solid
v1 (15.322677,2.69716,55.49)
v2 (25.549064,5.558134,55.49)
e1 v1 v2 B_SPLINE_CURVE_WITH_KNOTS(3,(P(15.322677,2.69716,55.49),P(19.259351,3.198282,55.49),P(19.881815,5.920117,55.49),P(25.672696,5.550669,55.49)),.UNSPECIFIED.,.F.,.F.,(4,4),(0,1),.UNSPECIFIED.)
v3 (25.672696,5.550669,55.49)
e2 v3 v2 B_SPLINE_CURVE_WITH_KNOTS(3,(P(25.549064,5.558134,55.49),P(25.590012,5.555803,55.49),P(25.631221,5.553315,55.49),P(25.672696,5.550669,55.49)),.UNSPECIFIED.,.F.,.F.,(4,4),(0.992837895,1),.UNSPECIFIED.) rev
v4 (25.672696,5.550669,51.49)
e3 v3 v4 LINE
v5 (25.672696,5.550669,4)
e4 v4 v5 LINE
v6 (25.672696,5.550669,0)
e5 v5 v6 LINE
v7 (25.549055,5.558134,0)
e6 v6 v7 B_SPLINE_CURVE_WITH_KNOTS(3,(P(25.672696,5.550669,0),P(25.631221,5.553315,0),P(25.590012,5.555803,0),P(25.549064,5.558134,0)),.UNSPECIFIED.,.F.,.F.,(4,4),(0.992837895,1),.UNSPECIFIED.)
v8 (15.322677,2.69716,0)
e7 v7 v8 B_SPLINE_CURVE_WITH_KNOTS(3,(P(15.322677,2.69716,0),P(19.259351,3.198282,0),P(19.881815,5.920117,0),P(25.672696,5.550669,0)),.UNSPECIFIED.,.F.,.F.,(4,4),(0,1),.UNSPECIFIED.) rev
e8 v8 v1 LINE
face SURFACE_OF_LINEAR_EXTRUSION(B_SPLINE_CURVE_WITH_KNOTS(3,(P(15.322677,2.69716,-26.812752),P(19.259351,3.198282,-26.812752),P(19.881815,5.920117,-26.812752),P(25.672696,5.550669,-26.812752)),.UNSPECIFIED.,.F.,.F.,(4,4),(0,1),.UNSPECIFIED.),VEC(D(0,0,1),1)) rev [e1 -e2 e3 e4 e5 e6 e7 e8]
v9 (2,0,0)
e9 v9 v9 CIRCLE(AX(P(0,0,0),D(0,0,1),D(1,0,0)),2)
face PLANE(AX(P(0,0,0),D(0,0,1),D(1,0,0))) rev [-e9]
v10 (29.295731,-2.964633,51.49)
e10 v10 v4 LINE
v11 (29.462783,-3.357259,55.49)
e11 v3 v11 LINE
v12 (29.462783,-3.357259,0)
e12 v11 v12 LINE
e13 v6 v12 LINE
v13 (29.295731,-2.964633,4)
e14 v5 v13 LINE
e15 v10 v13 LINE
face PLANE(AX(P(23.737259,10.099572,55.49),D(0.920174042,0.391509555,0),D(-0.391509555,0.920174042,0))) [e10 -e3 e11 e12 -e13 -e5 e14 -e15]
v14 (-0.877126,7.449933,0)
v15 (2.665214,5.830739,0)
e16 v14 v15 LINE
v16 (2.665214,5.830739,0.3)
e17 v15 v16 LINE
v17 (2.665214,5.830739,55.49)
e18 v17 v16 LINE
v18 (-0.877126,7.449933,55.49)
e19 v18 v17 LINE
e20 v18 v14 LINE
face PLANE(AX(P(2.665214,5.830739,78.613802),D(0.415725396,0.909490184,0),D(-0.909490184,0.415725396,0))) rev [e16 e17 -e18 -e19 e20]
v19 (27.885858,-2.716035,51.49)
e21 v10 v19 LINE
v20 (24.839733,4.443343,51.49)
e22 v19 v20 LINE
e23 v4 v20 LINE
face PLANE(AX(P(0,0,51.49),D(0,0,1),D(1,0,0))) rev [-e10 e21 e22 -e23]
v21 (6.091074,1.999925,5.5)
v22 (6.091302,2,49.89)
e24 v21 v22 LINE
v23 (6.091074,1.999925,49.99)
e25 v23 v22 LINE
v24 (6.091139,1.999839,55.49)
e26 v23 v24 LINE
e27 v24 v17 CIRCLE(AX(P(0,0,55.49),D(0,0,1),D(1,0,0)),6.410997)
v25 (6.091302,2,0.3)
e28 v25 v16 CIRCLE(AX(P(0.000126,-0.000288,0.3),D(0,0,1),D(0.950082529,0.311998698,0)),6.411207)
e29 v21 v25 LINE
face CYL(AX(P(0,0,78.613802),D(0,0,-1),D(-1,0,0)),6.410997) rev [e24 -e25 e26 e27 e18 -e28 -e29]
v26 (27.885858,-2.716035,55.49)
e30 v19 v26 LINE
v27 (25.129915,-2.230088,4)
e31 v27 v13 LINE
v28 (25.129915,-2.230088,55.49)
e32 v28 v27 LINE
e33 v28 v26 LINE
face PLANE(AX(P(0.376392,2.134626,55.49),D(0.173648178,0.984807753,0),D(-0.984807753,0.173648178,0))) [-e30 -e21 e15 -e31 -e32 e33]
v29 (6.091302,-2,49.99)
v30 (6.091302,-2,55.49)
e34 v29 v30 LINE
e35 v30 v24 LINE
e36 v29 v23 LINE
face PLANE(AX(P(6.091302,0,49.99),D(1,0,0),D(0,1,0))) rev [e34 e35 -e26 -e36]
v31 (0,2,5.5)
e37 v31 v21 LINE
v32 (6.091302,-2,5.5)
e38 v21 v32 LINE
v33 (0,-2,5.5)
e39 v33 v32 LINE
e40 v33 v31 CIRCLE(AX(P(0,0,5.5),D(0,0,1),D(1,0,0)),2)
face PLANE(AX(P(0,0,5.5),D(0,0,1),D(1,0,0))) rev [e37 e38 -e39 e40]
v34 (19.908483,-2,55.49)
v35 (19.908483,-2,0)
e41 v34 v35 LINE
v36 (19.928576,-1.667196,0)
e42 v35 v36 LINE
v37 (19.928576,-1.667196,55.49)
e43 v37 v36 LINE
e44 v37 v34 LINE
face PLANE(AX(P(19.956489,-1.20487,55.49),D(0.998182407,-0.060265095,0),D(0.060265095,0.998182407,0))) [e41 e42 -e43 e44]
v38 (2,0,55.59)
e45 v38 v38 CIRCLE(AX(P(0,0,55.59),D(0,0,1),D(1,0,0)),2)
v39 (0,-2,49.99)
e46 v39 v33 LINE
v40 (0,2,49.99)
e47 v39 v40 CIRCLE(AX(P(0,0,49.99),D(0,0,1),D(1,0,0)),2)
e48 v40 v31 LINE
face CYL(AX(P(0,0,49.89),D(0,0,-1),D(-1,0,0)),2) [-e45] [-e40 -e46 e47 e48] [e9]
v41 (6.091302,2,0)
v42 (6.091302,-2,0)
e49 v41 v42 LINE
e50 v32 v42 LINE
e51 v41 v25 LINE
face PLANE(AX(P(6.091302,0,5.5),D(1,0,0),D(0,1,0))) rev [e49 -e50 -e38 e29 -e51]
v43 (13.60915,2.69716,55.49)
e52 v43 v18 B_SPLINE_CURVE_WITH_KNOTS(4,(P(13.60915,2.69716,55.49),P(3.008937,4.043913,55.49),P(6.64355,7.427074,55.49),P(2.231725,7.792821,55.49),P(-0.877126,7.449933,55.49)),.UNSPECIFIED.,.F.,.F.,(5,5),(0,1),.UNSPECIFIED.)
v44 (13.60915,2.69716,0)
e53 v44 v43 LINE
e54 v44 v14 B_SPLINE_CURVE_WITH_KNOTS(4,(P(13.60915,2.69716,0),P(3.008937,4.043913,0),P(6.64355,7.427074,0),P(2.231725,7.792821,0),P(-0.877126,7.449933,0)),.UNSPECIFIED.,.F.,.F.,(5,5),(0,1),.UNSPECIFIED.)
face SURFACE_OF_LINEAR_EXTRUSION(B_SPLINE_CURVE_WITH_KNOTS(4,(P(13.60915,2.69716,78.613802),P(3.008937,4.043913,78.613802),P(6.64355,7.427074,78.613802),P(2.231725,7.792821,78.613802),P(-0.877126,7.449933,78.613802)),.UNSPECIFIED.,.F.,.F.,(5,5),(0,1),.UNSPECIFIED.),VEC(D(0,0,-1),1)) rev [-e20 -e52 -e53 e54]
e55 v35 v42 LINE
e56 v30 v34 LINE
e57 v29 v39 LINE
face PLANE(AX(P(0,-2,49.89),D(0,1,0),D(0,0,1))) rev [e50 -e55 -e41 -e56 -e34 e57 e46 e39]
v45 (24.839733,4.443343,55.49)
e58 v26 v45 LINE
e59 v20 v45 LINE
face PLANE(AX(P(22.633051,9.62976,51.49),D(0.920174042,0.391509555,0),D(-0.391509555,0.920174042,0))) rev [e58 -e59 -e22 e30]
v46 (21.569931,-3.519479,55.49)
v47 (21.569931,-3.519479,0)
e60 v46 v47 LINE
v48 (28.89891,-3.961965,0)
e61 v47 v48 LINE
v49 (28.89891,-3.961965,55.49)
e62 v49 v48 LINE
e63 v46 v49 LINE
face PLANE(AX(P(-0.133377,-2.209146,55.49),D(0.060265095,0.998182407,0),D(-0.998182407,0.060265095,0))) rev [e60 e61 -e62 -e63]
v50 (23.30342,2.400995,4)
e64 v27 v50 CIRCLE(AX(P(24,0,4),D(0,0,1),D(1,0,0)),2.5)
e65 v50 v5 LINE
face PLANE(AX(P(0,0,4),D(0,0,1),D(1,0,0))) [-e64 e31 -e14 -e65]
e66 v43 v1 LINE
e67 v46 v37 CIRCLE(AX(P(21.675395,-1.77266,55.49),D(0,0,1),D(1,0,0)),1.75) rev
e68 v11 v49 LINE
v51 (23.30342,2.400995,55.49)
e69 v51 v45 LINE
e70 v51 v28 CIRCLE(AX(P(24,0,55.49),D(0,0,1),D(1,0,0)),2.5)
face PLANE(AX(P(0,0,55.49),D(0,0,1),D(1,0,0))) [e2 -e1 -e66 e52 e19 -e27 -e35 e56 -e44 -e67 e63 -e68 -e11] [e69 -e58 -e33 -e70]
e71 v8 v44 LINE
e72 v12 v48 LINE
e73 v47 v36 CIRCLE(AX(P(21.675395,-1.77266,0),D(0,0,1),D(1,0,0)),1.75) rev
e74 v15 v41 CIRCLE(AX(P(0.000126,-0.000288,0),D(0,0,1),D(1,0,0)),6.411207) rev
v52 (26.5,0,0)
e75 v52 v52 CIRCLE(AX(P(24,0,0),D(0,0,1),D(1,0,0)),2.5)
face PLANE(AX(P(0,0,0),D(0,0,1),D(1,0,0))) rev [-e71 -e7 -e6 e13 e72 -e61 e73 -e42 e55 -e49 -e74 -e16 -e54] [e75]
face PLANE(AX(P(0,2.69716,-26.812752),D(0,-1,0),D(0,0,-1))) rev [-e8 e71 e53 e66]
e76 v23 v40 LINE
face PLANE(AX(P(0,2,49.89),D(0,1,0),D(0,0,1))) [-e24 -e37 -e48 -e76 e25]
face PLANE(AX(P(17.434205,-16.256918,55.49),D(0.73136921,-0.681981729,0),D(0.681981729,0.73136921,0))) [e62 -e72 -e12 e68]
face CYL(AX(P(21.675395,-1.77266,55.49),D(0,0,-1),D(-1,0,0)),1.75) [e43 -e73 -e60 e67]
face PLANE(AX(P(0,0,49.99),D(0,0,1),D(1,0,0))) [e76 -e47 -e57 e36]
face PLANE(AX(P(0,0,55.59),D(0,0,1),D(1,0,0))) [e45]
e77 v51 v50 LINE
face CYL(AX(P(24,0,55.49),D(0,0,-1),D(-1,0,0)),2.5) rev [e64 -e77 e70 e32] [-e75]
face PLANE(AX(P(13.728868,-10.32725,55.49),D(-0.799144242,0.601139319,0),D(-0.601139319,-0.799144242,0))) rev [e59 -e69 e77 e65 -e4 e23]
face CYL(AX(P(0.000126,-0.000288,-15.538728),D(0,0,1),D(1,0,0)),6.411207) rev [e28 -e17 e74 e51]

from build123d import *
from build123d.topology import SkipClean

# Parameters (mm, degrees)
BOSS_EXTRUDE1_DEPTH              = 55.49
BOSS_EXTRUDE5_DEPTH              = 4
BOSS_EXTRUDE6_START              = 51.49
BOSS_EXTRUDE6_DEPTH              = 4
BOSS_EXTRUDE7_START              = 5.6
BOSS_EXTRUDE7_DEPTH              = 44.29
SKETCH1_11_R                     = 2
BOSS_EXTRUDE8_DEPTH              = 55.59
BOSS_EXTRUDE9_DEPTH              = 55.49
BOSS_EXTRUDE10_REACH             = 60.551
SKETCH3_W                        = 44.29
SKETCH3_H                        = 4
BOSS_EXTRUDE11_START             = -49.89
BOSS_EXTRUDE11_DEPTH             = 55.49
CUT_EXTRUDE1_DEPTH               = 55.59
CUT_EXTRUDE1_DEPTH_BACK          = 55.59
BOSS_EXTRUDE12_DEPTH             = 49.59
BOSS_EXTRUDE12_DIRECTION_2_REACH = 60.225
BOSS_EXTRUDE13_DEPTH             = 4
BOSS_EXTRUDE14_START             = 55.49
BOSS_EXTRUDE14_DEPTH             = 4
BOSS_EXTRUDE15_DEPTH             = 0.3
CUT_EXTRUDE2_DEPTH               = 5.5
CUT_EXTRUDE3_START               = 55.49
CUT_EXTRUDE3_DEPTH               = 5.5
BOSS_EXTRUDE16_DEPTH             = 4
CUT_EXTRUDE4_DEPTH               = 5.5
CUT_EXTRUDE5_START               = -55.49
CUT_EXTRUDE5_DEPTH               = 5.5


# Read off the part's stored shape, not the designer's step: Boss-Extrude6
with BuildPart() as part:
    # Sketch1 → Boss-Extrude1 (new body)
    with BuildSketch(Plane.XY):
        with BuildLine():
            ThreePointArc((1.129915274, -2.230087773), (-2.325656227, -0.917236673), (-0.696579505, 2.400995001))
            Line((-0.696579505, 2.400995001), (0.839733193, 4.443342601))
            Line((0.839733193, 4.443342601), (1.672696268, 5.550669345))
            Line((1.672696268, 5.550669345), (-1.620002468, 5.749465478))
            Line((-1.620002468, 5.749465478), (-3.736897473, 3.873630853))
            Line((-3.736897473, 3.873630853), (-4.07142398, -1.667196274))
            ThreePointArc((-4.07142398, -1.667196274), (-3.634366728, -2.93327365), (-2.430068683, -3.519479403))
            Line((-2.430068683, -3.519479403), (4.898910437, -3.961965286))
            Line((4.898910437, -3.961965286), (5.462782558, -3.357258899))
            Line((5.462782558, -3.357258899), (5.295730888, -2.964633462))
            Line((5.295730888, -2.964633462), (3.885857643, -2.716034769))
            Line((3.885857643, -2.716034769), (1.129915274, -2.230087773))
        make_face()
    extrude(amount=BOSS_EXTRUDE1_DEPTH)

    # Sketch1<8> → Boss-Extrude5 (add)
    with BuildSketch(Plane.XY):
        Polygon((1.672696268, 5.550669345), (0.839733193, 4.443342601), (3.885857643, -2.716034769), (5.295730888, -2.964633462), align=None)
    extrude(amount=BOSS_EXTRUDE5_DEPTH)

    # Boss-Extrude6 outline → Boss-Extrude6 (add)
    with BuildSketch(Plane.XY.offset(BOSS_EXTRUDE6_START)):
        Polygon((3.885857643, -2.71603477), (5.295730888, -2.964633462), (1.672696268, 5.550669345), (0.839733193, 4.443342601), align=None)
    extrude(amount=BOSS_EXTRUDE6_DEPTH)


with BuildPart() as body_2:
    # Sketch1<10> → Boss-Extrude7 (new body)
    with BuildSketch(Plane.XY.offset(BOSS_EXTRUDE7_START)):
        with BuildLine():
            Line((0, -2), (12, -2))
            Line((12, -2), (12, 2))
            Line((12, 2), (0, 2))
            ThreePointArc((0, 2), (-2, 0), (0, -2))
        make_face()
    extrude(amount=BOSS_EXTRUDE7_DEPTH)

    # Sketch1<11> → Boss-Extrude8 (add)
    with BuildSketch(Plane.XY):
        Circle(SKETCH1_11_R)
    extrude(amount=BOSS_EXTRUDE8_DEPTH)


with BuildPart() as body_3:
    # Sketch1<12> → Boss-Extrude9 (new body)
    with BuildSketch(Plane.XY):
        with BuildLine():
            Line((22.5, 2), (20.149982379, 2))
            Line((20.149982379, 2), (19.92857602, -1.667196274))
            ThreePointArc((19.92857602, -1.667196274), (19.926466234, -1.833875846), (19.940224749, -2))
            Line((19.940224749, -2), (22.5, -2))
            ThreePointArc((22.5, -2), (21.5, 0), (22.5, 2))
        make_face()
        with BuildLine():
            Line((20.263102527, 3.873630853), (20.149982379, 2))
            Line((20.149982379, 2), (22.5, 2))
            ThreePointArc((22.5, 2), (22.883559394, 2.236863959), (23.303420495, 2.400995001))
            Line((23.303420495, 2.400995001), (24.839733193, 4.443342601))
            Line((24.839733193, 4.443342601), (25.672696268, 5.550669345))
            Line((25.672696268, 5.550669345), (22.379997532, 5.749465478))
            Line((22.379997532, 5.749465478), (20.263102527, 3.873630853))
        make_face()
        with BuildLine():
            Line((22.5, -2), (19.940224749, -2))
            ThreePointArc((19.940224749, -2), (20.482001684, -3.052625751), (21.569931317, -3.519479403))
            Line((21.569931317, -3.519479403), (28.898910437, -3.961965286))
            Line((28.898910437, -3.961965286), (29.462782558, -3.357258899))
            Line((29.462782558, -3.357258899), (29.295730888, -2.964633462))
            Line((29.295730888, -2.964633462), (27.885857643, -2.716034769))
            Line((27.885857643, -2.716034769), (25.129915274, -2.230087773))
            ThreePointArc((25.129915274, -2.230087773), (23.782110643, -2.490486745), (22.5, -2))
        make_face()
    extrude(amount=BOSS_EXTRUDE9_DEPTH)

    # Boss-Extrude10: up to this face of the body (flat: up to its plane)
    boss_extrude10_end = Plane(body_3.part.faces().sort_by_distance((20.095839274, 1.10321729, 27.745))[0])
    # Sketch3 → Boss-Extrude10 (add, up to the picked face)
    with BuildSketch(Plane(origin=(12, 0, 0), x_dir=(0, 0, -1), z_dir=(1, 0, 0)), mode=Mode.PRIVATE) as boss_extrude10_sk1:
        with Locations((-27.745, 0)):
            Rectangle(SKETCH3_W, SKETCH3_H)
    boss_extrude10_tool1 = split(extrude(boss_extrude10_sk1.sketch, amount=BOSS_EXTRUDE10_REACH, mode=Mode.PRIVATE), bisect_by=boss_extrude10_end, keep=Keep.BOTH, mode=Mode.PRIVATE)

    add(body_2.part)  # Boss-Extrude10 merges body 2
    add(boss_extrude10_tool1.solids().sort_by(Axis((12, 0, 27.745), (1, 0, 0)))[0])

    # Sketch4 → Boss-Extrude11 (add)
    with BuildSketch(Plane.XY.offset(49.89).offset(BOSS_EXTRUDE11_START)):
        with BuildLine():
            Line((20.263102527, 3.873630853), (25.672696268, 5.550669345))
            add(Edge.make_bspline(
                [(18.253064845, 3.63105347), (20.126675338, 4.576543011), (21.657010209, 5.806862999), (25.672696268, 5.550669345)],
                knots=[0.306550142, 0.306550142, 0.306550142, 0.306550142, 1, 1, 1, 1], degree=3))
            add(Edge.make_bspline(
                [(15.322676772, 2.697160199), (16.529464831, 2.850779242), (17.424806601, 3.213085323), (18.253064845, 3.63105347)],
                knots=[0, 0, 0, 0, 0.306550142, 0.306550142, 0.306550142, 0.306550142], degree=3))
            Line((15.322676772, 2.697160199), (13.609149986, 2.697160199))
            Line((13.609149986, 2.697160199), (13.609149986, 2))
            Line((13.609149986, 2), (0, 2))
            ThreePointArc((0, 2), (2, 0), (0, -2))
            Line((0, -2), (6.092058814, -2))
            Line((6.092058814, -2), (19.908483051, -2))
            Line((19.908483051, -2), (20.263102527, 3.873630853))
        make_face()
    extrude(amount=BOSS_EXTRUDE11_DEPTH)

    # Sketch4<5> → Cut-Extrude1 (cut, two sides: drawn at the far end of the back side and taken through both)
    with BuildSketch(Plane.XY.offset(49.89).offset(-CUT_EXTRUDE1_DEPTH_BACK)):
        with BuildLine():
            add(Edge.make_bspline(
                [(18.253064845, 3.63105347), (20.126675338, 4.576543011), (21.657010209, 5.806862999), (25.672696268, 5.550669345)],
                knots=[0.306550142, 0.306550142, 0.306550142, 0.306550142, 1, 1, 1, 1], degree=3))
            Line((25.672696268, 5.550669345), (19.033452373, 9.878906939))
            Line((19.033452373, 9.878906939), (18.253064845, 3.63105347))
        make_face()
    extrude(amount=CUT_EXTRUDE1_DEPTH + CUT_EXTRUDE1_DEPTH_BACK, mode=Mode.SUBTRACT)

    # Sketch4<6> → Boss-Extrude12 (add)
    with BuildSketch(Plane.XY.offset(49.89)):
        with BuildLine():
            Line((6.092058814, 2), (13.609149986, 2))
            Line((13.609149986, 2), (13.609149986, 2.697160199))
            add(Edge.make_bspline(
                [(13.609149986, 2.697160199), (3.008937487, 4.043912628), (6.643549935, 7.427073901), (2.231724762, 7.792821065), (-0.877126137, 7.449933099)],
                knots=[0, 0, 0, 0, 0, 1, 1, 1, 1, 1], degree=4))
            Line((-0.877126137, 7.449933099), (2.665214437, 5.830739223))
            ThreePointArc((2.665214437, 5.830739223), (4.778774076, 4.27366426), (6.091049818, 2))
            Line((6.091049818, 2), (6.092058814, 2))
        make_face()
    extrude(amount=-BOSS_EXTRUDE12_DEPTH)

    # Boss-Extrude12 direction 2: up to this face of the body (flat: up to its plane)
    boss_extrude12_direction_2_end = Plane(body_3.part.faces().sort_by_distance((14.730018873, 0.349949508, 55.49))[0])
    # Sketch4<6> → Boss-Extrude12 direction 2 (add, up to the picked face)
    with BuildSketch(Plane.XY.offset(49.89), mode=Mode.PRIVATE) as boss_extrude12_direction_2_sk1:
        with BuildLine():
            Line((6.092058814, 2), (13.609149986, 2))
            Line((13.609149986, 2), (13.609149986, 2.697160199))
            add(Edge.make_bspline(
                [(13.609149986, 2.697160199), (3.008937487, 4.043912628), (6.643549935, 7.427073901), (2.231724762, 7.792821065), (-0.877126137, 7.449933099)],
                knots=[0, 0, 0, 0, 0, 1, 1, 1, 1, 1], degree=4))
            Line((-0.877126137, 7.449933099), (2.665214437, 5.830739223))
            ThreePointArc((2.665214437, 5.830739223), (4.778774076, 4.27366426), (6.091049818, 2))
            Line((6.091049818, 2), (6.092058814, 2))
        make_face()
    boss_extrude12_direction_2_tool1 = split(extrude(boss_extrude12_direction_2_sk1.sketch, amount=BOSS_EXTRUDE12_DIRECTION_2_REACH, mode=Mode.PRIVATE), bisect_by=boss_extrude12_direction_2_end, keep=Keep.BOTH, mode=Mode.PRIVATE)
    add(boss_extrude12_direction_2_tool1.solids().sort_by(Axis((6.524615, 4.223787, 49.89), (0, 0, 1)))[0])

    # Sketch1<13> → Boss-Extrude13 (add)
    with BuildSketch(Plane.XY):
        Polygon((25.672696268, 5.550669345), (24.839733193, 4.443342601), (27.885857643, -2.716034769), (29.295730888, -2.964633462), align=None)
    extrude(amount=BOSS_EXTRUDE13_DEPTH)

    # Sketch1<14> → Boss-Extrude14 (add)
    with BuildSketch(Plane.XY.offset(BOSS_EXTRUDE14_START)):
        Polygon((25.672696268, 5.550669345), (24.839733193, 4.443342601), (27.885857643, -2.716034769), (29.295730888, -2.964633462), align=None)
    extrude(amount=-BOSS_EXTRUDE14_DEPTH)

    # Sketch5 → Boss-Extrude15 (add)
    with BuildSketch(Plane(origin=(0, 0, 0.3), x_dir=(-1, 0, 0), z_dir=(0, 0, -1))):
        with BuildLine():
            Line((-13.609149986, 2), (-6.091302067, 2))
            ThreePointArc((-6.091302067, 2), (-4.778900201, 4.273690642), (-2.665214437, 5.830739223))
            Line((-2.665214437, 5.830739223), (0.877126137, 7.449933099))
            add(Edge.make_bspline(
                [(0.877126137, 7.449933099), (-2.231724762, 7.792821065), (-6.643549935, 7.427073901), (-3.008937487, 4.043912628), (-13.609149986, 2.697160199)],
                knots=[0, 0, 0, 0, 0, 1, 1, 1, 1, 1], degree=4))
            Line((-13.609149986, 2.697160199), (-13.609149986, 2))
        make_face()
    extrude(amount=BOSS_EXTRUDE15_DEPTH)

    # Sketch1<15> → Cut-Extrude2 (cut)
    with SkipClean():  # the faces are left unmerged after this step: merging them gives an invalid solid
        with BuildSketch(Plane.XY):
            with BuildLine():
                Line((0, -2), (4.885305034, -2))
                Line((4.885305034, -2), (3.183411536, 2))
                Line((3.183411536, 2), (0, 2))
                ThreePointArc((0, 2), (2, 0), (0, -2))
            make_face()
        extrude(amount=CUT_EXTRUDE2_DEPTH, mode=Mode.SUBTRACT)

    # Sketch1<16> → Cut-Extrude3 (cut)
    with SkipClean():  # the faces are left unmerged after this step: merging them gives an invalid solid
        with BuildSketch(Plane.XY.offset(CUT_EXTRUDE3_START)):
            with BuildLine():
                Line((0, -2), (4.885305034, -2))
                Line((4.885305034, -2), (3.183411536, 2))
                Line((3.183411536, 2), (0, 2))
                ThreePointArc((0, 2), (2, 0), (0, -2))
            make_face()
        extrude(amount=-CUT_EXTRUDE3_DEPTH, mode=Mode.SUBTRACT)

    # Sketch1<17> → Boss-Extrude16 (add)
    with SkipClean():  # the faces are left unmerged after this step: merging them gives an invalid solid
        with BuildSketch(Plane.XY):
            with BuildLine():
                Line((24.839733193, 4.443342601), (23.303420495, 2.400995001))
                ThreePointArc((23.303420495, 2.400995001), (25.50142453, 1.998930809), (26.5, 0))
                ThreePointArc((26.5, 0), (26.499999366, -0.001781138), (26.499997462, -0.003562276))
                ThreePointArc((26.499997462, -0.003562276), (26.129183075, -1.310182978), (25.129915274, -2.230087773))
                Line((25.129915274, -2.230087773), (27.885857643, -2.716034769))
                Line((27.885857643, -2.716034769), (24.839733193, 4.443342601))
            make_face()
        extrude(amount=BOSS_EXTRUDE16_DEPTH)

    # Sketch6 → Cut-Extrude4 (cut)
    with SkipClean():  # the faces are left unmerged after this step: merging them gives an invalid solid
        with BuildSketch(Plane(origin=(0, 0, 0), x_dir=(-1, 0, 0), z_dir=(0, 0, -1))):
            Polygon((-3.183411536, 2), (-6.091302067, 2), (-6.091302067, -2), (-4.885305034, -2), align=None)
        extrude(amount=-CUT_EXTRUDE4_DEPTH, mode=Mode.SUBTRACT)

    # Sketch6<3> → Cut-Extrude5 (cut)
    with SkipClean():  # the faces are left unmerged after this step: merging them gives an invalid solid
        with BuildSketch(Plane(origin=(0, 0, 0), x_dir=(-1, 0, 0), z_dir=(0, 0, -1)).offset(CUT_EXTRUDE5_START)):
            Polygon((-3.183411536, 2), (-6.091302067, 2), (-6.091302067, -2), (-4.885305034, -2), align=None)
        extrude(amount=CUT_EXTRUDE5_DEPTH, mode=Mode.SUBTRACT)


solid = body_3.part
